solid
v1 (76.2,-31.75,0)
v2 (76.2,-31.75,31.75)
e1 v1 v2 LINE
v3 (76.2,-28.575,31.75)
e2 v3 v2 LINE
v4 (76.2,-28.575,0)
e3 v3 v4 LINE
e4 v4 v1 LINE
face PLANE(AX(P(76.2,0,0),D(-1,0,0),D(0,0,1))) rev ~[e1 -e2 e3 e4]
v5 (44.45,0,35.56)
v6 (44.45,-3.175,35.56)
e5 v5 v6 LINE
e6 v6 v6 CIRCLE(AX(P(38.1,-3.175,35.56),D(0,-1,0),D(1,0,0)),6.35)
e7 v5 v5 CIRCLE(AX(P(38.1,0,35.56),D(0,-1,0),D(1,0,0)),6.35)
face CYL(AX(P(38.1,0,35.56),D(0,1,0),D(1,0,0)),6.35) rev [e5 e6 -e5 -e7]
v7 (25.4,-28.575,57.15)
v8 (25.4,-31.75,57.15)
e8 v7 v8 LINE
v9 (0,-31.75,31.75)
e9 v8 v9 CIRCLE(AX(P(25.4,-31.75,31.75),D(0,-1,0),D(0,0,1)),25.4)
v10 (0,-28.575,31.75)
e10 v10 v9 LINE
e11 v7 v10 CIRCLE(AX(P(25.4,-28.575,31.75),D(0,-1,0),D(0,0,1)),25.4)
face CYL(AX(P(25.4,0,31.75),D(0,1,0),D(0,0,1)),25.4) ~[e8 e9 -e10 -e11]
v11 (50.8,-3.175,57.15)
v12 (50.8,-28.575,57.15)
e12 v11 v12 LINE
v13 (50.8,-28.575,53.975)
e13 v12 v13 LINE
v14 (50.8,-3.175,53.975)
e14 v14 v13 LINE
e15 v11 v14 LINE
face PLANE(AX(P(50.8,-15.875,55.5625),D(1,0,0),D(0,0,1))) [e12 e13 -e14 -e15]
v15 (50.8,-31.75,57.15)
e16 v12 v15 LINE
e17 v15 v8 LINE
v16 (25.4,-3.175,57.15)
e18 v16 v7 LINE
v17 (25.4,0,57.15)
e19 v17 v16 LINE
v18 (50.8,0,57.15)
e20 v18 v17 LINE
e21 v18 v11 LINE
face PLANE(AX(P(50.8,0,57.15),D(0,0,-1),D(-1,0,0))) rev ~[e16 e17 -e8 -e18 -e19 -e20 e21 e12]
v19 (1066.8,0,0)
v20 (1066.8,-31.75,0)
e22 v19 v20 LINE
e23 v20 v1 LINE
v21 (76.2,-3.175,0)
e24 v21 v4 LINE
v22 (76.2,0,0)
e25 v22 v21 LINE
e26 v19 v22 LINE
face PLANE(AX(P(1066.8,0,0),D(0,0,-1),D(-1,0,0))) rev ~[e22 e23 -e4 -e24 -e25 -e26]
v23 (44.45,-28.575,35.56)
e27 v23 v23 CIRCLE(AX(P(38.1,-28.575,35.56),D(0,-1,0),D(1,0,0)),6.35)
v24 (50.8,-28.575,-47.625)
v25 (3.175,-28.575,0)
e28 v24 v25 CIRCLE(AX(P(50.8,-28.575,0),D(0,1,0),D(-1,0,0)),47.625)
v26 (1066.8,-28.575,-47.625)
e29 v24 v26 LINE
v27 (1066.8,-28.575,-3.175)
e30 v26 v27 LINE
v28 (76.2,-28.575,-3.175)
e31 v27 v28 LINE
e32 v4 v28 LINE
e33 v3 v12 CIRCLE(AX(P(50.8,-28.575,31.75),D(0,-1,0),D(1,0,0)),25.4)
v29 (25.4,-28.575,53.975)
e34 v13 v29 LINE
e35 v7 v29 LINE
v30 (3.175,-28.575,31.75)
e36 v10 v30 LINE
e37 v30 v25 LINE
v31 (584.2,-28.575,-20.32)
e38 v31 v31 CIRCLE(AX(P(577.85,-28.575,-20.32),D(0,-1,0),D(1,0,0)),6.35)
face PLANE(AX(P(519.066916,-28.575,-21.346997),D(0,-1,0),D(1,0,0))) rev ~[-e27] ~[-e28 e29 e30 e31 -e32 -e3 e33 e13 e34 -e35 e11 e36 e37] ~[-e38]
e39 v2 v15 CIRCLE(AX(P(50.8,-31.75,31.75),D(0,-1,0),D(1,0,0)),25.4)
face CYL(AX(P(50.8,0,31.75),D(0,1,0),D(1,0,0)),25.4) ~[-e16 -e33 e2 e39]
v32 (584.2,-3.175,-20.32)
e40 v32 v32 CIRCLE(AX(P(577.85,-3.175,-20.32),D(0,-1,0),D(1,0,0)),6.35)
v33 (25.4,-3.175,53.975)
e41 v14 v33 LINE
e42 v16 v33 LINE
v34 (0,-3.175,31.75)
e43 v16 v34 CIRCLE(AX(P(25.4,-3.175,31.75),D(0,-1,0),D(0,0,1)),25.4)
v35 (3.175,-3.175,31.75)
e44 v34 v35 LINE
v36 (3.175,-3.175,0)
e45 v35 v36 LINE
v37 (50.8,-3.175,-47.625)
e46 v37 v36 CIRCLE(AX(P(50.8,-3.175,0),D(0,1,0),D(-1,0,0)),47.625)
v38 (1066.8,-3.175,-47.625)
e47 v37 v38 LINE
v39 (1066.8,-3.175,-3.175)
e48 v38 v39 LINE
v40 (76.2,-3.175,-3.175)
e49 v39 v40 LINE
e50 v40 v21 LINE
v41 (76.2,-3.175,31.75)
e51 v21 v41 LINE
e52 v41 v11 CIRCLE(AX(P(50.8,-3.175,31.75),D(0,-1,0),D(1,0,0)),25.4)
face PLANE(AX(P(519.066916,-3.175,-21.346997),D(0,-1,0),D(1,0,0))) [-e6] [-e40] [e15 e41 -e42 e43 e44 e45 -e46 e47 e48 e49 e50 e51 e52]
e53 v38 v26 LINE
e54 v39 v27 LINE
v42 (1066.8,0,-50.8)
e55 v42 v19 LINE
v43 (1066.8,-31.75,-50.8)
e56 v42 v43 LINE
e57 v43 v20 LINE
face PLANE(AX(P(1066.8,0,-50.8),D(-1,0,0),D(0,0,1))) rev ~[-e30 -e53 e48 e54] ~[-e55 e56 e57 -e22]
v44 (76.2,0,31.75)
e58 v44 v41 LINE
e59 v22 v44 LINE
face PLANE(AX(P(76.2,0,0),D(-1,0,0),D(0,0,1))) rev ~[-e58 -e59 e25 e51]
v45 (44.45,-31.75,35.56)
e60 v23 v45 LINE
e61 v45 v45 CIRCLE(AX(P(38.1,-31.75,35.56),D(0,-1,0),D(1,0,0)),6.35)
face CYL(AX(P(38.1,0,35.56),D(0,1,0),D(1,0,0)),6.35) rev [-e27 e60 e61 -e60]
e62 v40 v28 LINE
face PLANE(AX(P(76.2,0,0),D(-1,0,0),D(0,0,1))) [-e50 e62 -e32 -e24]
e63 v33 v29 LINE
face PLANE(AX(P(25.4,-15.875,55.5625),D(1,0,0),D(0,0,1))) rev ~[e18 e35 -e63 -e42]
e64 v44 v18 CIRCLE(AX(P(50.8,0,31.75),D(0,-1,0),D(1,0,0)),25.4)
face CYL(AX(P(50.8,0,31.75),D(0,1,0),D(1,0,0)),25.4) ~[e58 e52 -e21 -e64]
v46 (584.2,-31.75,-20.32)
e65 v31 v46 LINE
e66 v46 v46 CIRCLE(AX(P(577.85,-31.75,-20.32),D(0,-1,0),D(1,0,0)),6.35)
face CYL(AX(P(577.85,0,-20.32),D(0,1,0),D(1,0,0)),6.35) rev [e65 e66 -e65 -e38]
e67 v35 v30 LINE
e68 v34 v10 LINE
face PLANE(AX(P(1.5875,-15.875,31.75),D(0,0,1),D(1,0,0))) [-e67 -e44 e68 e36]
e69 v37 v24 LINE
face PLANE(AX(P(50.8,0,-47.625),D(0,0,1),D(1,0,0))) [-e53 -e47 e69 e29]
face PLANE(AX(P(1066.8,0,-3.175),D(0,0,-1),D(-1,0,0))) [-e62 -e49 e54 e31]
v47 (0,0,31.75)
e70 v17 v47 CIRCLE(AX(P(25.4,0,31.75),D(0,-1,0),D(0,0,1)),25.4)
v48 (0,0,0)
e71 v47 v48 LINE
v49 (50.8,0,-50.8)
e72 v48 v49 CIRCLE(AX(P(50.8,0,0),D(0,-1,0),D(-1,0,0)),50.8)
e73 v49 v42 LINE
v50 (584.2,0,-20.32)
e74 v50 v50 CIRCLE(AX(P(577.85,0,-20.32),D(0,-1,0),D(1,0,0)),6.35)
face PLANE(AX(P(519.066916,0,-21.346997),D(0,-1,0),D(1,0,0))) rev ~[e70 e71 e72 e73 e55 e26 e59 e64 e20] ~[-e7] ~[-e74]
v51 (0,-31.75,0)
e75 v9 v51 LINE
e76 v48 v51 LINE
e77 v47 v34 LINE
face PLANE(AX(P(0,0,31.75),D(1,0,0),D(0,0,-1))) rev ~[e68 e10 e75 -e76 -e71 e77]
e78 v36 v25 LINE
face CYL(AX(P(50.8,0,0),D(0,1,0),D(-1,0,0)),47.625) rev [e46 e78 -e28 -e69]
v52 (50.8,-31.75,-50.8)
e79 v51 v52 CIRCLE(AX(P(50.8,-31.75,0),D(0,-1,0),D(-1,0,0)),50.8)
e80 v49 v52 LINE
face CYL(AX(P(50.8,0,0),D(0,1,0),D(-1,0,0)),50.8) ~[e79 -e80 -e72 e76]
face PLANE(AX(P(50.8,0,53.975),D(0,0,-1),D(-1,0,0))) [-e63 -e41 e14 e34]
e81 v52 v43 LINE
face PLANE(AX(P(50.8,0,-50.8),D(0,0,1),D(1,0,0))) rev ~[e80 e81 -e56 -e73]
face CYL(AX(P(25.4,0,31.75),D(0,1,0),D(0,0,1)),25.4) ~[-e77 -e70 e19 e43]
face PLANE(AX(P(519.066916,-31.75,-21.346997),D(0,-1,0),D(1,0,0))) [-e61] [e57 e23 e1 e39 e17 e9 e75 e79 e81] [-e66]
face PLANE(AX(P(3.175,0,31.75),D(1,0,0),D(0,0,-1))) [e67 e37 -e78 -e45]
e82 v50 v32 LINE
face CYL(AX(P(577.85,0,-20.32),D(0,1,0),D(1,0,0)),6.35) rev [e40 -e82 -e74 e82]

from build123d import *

# Parameters (mm, degrees)
F0_R     = 6.35
F1_DEPTH = 31.75
F2_T     = 3.175


# Not quite as in the source:
# - a shell that OpenCascade refuses in one call is made with other operations: the cavity is built on its own and cut out


with BuildPart() as f1:
    # F0 (on Front) → F1 (new body)
    with BuildSketch(Plane.XZ):
        with BuildLine():
            Line((1066.8, 0), (76.2, 0))
            Line((76.2, 0), (76.2, 31.75))
            ThreePointArc((76.2, 31.75), (68.7605122421, 49.7105122421), (50.8, 57.15))
            Line((50.8, 57.15), (25.4, 57.15))
            ThreePointArc((25.4, 57.15), (7.4394877579, 49.7105122421), (0, 31.75))
            Line((0, 31.75), (0, 0))
            ThreePointArc((0, 0), (14.8789755157, -35.9210244843), (50.8, -50.8))
            Line((50.8, -50.8), (1066.8, -50.8))
            Line((1066.8, -50.8), (1066.8, 0))
        make_face()
        with Locations((577.85, -20.32)):
            Circle(F0_R, mode=Mode.SUBTRACT)
        with Locations((38.1, 35.56)):
            Circle(F0_R, mode=Mode.SUBTRACT)
    extrude(amount=F1_DEPTH)

    # F2: shell of thickness 3.175, made by hand


with BuildPart() as f2_core1:
    # F2_t2: copy of F1
    add(f1.part)

    # the walls: a layer under each face that stays
    f2_faces = [f2_core1.faces().sort_by_distance(p)[0] for p in [
        (571.5, -15.875, 0),
        (38.1, -15.875, 57.15),
        (0, -15.875, 15.875),
        (14.8789755157, -15.875, -35.9210244843),
        (558.8, -15.875, -50.8),
        (177.8, 0, -32.8083333333),
        (177.8, -31.75, -32.8083333333),
    ]]
    thicken(f2_faces, amount=-F2_T, mode=Mode.SUBTRACT)


with BuildPart() as f1_1:
    add(f1.part)

    # what is left inside the walls is the cavity
    f2_cavity = [f2_core1.part.solids().sort_by_distance(p)[0] for p in [
        (533.4, -28.54325, -12.7),
    ]]
    add(f2_cavity, mode=Mode.SUBTRACT)


solid = f1_1.part
